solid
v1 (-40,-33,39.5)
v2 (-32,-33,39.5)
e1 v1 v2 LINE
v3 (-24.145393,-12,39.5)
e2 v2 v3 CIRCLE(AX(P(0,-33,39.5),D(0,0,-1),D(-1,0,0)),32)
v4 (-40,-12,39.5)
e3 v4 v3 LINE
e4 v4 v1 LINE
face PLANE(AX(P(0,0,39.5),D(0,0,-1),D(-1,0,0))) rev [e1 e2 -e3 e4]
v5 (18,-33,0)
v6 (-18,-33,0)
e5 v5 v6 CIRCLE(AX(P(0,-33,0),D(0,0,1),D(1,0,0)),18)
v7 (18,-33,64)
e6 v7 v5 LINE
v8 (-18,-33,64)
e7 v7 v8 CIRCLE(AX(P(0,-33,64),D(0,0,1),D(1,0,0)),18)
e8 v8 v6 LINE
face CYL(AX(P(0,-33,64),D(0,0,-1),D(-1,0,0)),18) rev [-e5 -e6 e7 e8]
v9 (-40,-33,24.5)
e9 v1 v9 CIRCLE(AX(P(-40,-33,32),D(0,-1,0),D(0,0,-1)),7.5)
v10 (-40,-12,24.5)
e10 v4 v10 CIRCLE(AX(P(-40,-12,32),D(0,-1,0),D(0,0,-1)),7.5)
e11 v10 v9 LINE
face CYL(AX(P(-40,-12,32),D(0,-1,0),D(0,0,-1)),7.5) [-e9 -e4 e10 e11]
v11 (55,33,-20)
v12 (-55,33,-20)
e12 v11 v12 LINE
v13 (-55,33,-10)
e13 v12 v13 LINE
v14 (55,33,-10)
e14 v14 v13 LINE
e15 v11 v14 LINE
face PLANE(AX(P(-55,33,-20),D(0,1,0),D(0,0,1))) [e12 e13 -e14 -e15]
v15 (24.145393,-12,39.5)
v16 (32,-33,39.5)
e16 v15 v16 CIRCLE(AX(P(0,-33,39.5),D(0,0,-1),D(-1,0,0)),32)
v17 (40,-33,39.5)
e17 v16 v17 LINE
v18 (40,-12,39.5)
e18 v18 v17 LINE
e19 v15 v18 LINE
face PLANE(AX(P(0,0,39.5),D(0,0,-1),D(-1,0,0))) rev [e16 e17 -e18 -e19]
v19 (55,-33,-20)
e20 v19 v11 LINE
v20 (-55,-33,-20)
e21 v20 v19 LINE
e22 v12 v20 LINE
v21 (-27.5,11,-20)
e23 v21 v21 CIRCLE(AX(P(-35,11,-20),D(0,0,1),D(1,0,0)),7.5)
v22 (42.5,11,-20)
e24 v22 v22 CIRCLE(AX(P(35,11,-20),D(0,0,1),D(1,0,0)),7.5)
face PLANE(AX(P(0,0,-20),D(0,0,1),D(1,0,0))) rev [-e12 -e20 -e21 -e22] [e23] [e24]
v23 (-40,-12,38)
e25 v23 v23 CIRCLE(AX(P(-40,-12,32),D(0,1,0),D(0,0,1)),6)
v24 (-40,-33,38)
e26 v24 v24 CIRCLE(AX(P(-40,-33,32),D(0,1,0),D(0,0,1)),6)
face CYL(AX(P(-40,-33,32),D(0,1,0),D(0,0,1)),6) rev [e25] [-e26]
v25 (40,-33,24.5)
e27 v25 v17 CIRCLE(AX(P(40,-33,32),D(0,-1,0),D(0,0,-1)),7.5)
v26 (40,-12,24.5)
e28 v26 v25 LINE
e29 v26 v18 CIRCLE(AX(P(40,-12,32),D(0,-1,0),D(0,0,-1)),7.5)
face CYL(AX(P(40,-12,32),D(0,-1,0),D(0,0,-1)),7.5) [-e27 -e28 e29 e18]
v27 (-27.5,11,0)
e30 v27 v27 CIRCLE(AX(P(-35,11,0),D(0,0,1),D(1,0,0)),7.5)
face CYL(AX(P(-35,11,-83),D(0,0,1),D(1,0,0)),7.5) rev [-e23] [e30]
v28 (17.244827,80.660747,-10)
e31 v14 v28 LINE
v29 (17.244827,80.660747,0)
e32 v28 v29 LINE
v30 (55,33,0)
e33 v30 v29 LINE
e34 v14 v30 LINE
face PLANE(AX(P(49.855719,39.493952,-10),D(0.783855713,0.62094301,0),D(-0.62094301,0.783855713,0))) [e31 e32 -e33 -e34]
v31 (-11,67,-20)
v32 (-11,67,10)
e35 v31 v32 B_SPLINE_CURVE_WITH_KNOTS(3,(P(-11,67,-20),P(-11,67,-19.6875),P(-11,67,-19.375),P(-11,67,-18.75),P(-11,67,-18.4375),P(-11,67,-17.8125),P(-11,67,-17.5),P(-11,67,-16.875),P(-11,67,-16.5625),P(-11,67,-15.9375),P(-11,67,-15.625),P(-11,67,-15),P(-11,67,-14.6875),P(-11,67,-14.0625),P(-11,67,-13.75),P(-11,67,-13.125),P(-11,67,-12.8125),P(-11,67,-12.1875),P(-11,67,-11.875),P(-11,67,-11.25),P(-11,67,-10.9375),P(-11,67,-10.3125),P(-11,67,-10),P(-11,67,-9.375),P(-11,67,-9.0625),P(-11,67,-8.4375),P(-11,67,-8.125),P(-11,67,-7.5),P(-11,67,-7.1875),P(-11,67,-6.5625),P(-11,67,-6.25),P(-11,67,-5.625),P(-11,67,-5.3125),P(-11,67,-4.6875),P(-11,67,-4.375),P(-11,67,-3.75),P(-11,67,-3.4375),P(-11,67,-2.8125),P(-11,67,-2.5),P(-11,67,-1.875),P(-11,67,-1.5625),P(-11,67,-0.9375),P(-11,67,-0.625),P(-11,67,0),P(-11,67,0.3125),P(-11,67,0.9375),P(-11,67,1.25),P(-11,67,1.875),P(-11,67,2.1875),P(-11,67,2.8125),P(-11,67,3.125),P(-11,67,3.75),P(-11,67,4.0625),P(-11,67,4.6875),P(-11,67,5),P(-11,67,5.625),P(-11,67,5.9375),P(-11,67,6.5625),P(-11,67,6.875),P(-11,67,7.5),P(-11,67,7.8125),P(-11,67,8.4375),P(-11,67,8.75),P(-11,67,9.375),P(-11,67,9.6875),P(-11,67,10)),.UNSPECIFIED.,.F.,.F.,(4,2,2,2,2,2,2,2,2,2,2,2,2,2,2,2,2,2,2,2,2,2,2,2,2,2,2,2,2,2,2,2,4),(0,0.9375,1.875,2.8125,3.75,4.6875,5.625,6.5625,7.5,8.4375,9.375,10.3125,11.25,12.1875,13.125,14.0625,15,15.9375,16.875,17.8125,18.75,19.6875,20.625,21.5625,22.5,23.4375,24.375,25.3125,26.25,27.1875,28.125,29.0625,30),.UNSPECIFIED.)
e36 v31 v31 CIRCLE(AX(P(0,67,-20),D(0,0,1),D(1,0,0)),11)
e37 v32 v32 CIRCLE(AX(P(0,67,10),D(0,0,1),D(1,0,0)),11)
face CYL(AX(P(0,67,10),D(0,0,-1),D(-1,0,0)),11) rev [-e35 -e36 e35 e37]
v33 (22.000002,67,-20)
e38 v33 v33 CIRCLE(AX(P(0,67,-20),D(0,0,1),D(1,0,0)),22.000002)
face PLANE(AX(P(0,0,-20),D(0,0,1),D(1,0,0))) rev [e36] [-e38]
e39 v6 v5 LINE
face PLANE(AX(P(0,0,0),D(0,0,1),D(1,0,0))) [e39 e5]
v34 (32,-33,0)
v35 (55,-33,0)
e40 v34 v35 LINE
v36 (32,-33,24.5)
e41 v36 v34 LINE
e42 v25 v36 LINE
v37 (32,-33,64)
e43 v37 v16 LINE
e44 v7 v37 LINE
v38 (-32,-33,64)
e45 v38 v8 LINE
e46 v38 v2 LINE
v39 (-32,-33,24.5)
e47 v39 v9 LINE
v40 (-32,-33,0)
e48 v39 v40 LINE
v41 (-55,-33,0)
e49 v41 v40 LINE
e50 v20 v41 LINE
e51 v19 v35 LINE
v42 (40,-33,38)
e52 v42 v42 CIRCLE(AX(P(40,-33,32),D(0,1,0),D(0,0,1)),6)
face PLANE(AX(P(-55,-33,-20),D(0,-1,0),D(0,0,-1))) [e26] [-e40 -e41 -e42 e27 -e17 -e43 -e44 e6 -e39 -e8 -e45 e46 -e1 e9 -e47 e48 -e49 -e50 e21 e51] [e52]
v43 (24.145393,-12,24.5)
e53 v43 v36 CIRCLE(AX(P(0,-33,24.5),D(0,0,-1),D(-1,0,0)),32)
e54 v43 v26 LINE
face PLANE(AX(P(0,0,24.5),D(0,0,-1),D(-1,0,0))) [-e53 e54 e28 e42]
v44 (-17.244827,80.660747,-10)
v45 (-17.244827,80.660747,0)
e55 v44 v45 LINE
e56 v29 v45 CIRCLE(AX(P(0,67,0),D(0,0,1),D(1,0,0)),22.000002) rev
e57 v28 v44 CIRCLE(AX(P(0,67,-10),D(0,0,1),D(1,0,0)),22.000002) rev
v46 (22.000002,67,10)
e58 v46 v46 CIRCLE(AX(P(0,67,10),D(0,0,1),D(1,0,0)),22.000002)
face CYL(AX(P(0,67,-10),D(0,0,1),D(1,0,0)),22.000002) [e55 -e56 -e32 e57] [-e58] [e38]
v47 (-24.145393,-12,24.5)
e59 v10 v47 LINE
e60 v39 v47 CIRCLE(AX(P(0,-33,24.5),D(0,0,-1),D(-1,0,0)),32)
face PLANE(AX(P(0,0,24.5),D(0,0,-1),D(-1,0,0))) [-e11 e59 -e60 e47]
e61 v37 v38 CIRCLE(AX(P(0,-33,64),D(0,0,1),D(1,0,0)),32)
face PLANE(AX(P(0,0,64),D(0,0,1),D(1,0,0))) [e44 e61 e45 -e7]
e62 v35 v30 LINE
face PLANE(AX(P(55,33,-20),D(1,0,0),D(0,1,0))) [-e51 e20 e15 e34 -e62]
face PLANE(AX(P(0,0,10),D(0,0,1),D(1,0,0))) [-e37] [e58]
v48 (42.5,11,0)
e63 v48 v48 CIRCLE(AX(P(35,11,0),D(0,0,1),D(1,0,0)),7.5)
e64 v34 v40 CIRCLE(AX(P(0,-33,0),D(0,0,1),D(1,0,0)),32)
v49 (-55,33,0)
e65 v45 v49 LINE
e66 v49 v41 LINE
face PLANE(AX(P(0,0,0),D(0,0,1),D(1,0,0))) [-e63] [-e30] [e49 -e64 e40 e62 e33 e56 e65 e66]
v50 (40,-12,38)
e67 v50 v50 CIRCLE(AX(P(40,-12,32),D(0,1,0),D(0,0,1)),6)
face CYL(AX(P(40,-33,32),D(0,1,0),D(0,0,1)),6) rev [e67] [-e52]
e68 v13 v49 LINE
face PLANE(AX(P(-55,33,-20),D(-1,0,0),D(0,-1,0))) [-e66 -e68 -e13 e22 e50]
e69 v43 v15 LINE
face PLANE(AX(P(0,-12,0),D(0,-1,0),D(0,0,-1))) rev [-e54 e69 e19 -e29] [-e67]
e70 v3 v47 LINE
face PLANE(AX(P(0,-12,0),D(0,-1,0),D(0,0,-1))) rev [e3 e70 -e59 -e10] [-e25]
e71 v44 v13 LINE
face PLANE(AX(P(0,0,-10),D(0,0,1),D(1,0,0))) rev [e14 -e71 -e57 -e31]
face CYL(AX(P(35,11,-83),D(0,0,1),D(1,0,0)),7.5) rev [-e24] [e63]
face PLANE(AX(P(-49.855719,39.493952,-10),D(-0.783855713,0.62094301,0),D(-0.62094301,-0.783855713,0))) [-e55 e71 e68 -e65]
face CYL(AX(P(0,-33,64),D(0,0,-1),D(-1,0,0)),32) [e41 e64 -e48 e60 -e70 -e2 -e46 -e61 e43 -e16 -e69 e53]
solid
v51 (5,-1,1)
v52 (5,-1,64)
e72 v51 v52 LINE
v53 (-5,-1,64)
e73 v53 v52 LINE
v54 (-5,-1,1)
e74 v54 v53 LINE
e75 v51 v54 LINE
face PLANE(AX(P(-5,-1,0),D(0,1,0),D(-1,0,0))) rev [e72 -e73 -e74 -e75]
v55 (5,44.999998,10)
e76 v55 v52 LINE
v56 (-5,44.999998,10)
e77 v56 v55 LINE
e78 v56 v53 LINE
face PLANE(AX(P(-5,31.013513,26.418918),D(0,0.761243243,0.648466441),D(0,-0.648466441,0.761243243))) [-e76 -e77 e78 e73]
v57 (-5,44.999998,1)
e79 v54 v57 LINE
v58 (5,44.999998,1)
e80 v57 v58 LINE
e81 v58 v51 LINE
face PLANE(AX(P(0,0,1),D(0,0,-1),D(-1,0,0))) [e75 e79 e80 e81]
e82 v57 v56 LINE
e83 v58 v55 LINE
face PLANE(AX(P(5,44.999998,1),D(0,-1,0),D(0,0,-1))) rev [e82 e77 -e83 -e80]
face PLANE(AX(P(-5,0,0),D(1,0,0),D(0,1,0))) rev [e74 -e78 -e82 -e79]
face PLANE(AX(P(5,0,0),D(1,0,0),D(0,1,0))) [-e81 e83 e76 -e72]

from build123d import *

# Parameters (mm, degrees)
SKETCH2_W                = 110
SKETCH2_H                = 66
BOSS_EXTRUDE1_DEPTH      = 20
BOSS_EXTRUDE3_DEPTH      = 10
BOSS_EXTRUDE5_DEPTH      = 10
BOSS_EXTRUDE5_DEPTH_BACK = 20
SKETCH4_R                = 22
SKETCH4_R_2              = 11
SKETCH5_R                = 11
CUT_EXTRUDE1_DEPTH       = 91
BOSS_EXTRUDE6_DEPTH      = 64
SKETCH10_W               = 10
SKETCH10_H               = 147.367843809
EXTRUDE_THIN1_DEPTH      = 15
BOSS_EXTRUDE9_DEPTH      = 5
BOSS_EXTRUDE9_DEPTH_BACK = 5
SKETCH12_W               = 15
SKETCH12_H               = 147.367843809
CUT_EXTRUDE2_DEPTH       = 83
CUT_EXTRUDE3_DEPTH       = 83
BOSS_EXTRUDE12_DEPTH     = 21
BOSS_EXTRUDE12_2_DEPTH   = 21
LOFT2_START              = -33
LOFT2_OUTLINE_W          = 64
LOFT2_OUTLINE_H          = 15
LOFT2_DEPTH              = 21
CUT_EXTRUDE4_START       = -21
SKETCH16_R               = 18
CUT_EXTRUDE4_DEPTH       = 21
CUT_EXTRUDE5_DEPTH       = 21
SKETCH25_W               = 10
SKETCH25_H               = 45.999998161
BOSS_EXTRUDE15_DEPTH     = 9


# Read off the part's stored shape, not the designer's step: Loft2
with BuildPart() as part:
    # Sketch2 → Boss-Extrude1 (new body)
    with BuildSketch(Plane.XY):
        Rectangle(SKETCH2_W, SKETCH2_H)
    extrude(amount=-BOSS_EXTRUDE1_DEPTH)

    # Sketch3 → Boss-Extrude3 (add)
    with BuildSketch(Plane.XY):
        with BuildLine():
            Line((-55, 33), (55, 33))
            Line((55, 33), (17.244826829, 80.660747731))
            ThreePointArc((17.244826829, 80.660747731), (3.5e-08, 89.000001839), (-17.244826785, 80.660747787))
            Line((-17.244826785, 80.660747787), (-55, 33))
        make_face()
    extrude(amount=-BOSS_EXTRUDE3_DEPTH)

    # Sketch4 → Boss-Extrude5 (add, two sides: drawn at the far end of the back side and taken through both)
    with BuildSketch(Plane.XY.offset(-BOSS_EXTRUDE5_DEPTH_BACK)):
        with Locations((0, 67)):
            Circle(SKETCH4_R)
        with Locations(Location((0, 67, 0), (0, 0, 180))):
            Circle(SKETCH4_R_2, mode=Mode.SUBTRACT)
    extrude(amount=BOSS_EXTRUDE5_DEPTH + BOSS_EXTRUDE5_DEPTH_BACK)

    # Sketch5 → Cut-Extrude1 (cut)
    with BuildSketch(Plane.XY):
        with Locations(Location((0, 67, 0), (0, 0, 180))):
            Circle(SKETCH5_R)
    extrude(amount=-CUT_EXTRUDE1_DEPTH, mode=Mode.SUBTRACT)

    # Sketch6 → Boss-Extrude6 (add)
    with BuildSketch(Plane.XY):
        with BuildLine():
            Line((-32, -33), (-18, -33))
            ThreePointArc((-18, -33), (0, -15), (18, -33))
            Line((18, -33), (32, -33))
            ThreePointArc((32, -33), (0, -1), (-32, -33))
        make_face()
    extrude(amount=BOSS_EXTRUDE6_DEPTH)

    # Sketch10 → Extrude-Thin1 (add)
    with BuildSketch(Plane(origin=(0, 0, -20), x_dir=(-1, 0, 0), z_dir=(0, 0, -1))):
        with Locations((5, 40.683921905)):
            Rectangle(SKETCH10_W, SKETCH10_H)
    extrude(amount=EXTRUDE_THIN1_DEPTH)

    # Sketch12 → Cut-Extrude2 (cut)
    with BuildSketch(Plane(origin=(0, 0, 0), x_dir=(0, 0, -1), z_dir=(1, 0, 0))):
        with Locations((27.5, 40.683921905)):
            Rectangle(SKETCH12_W, SKETCH12_H)
    extrude(amount=-CUT_EXTRUDE2_DEPTH, mode=Mode.SUBTRACT)

    # Sketch13 → Cut-Extrude3 (cut)
    with BuildSketch(Plane.XY):
        with BuildLine():
            Line((-42.5, 11), (-35, 11))
            Line((-35, 11), (-27.5, 11))
            ThreePointArc((-27.5, 11), (-35, 18.5), (-42.5, 11))
        make_face()
        with BuildLine():
            Line((-27.5, 11), (-35, 11))
            Line((-35, 11), (-42.5, 11))
            ThreePointArc((-42.5, 11), (-35, 3.5), (-27.5, 11))
        make_face()
        with BuildLine():
            ThreePointArc((42.5, 11), (35, 18.5), (27.5, 11))
            Line((27.5, 11), (35, 11))
            Line((35, 11), (42.5, 11))
        make_face()
        with BuildLine():
            Line((35, 11), (27.5, 11))
            ThreePointArc((27.5, 11), (35, 3.5), (42.5, 11))
            Line((42.5, 11), (35, 11))
        make_face()
    extrude(amount=-CUT_EXTRUDE3_DEPTH, mode=Mode.SUBTRACT)



with BuildPart() as body_2:
    # Sketch11 → Boss-Extrude9 (new, two sides: drawn at the far end of the back side and taken through both)
    with BuildSketch(Plane(origin=(0, 0, 0), x_dir=(0, 0, -1), z_dir=(1, 0, 0)).offset(-BOSS_EXTRUDE9_DEPTH_BACK)):
        Polygon((-10, -1), (-64, -1), (-10, 44.999998161), align=None)
    extrude(amount=BOSS_EXTRUDE9_DEPTH + BOSS_EXTRUDE9_DEPTH_BACK)

    # Sketch25 → Boss-Extrude15 (add)
    with BuildSketch(Plane(origin=(0, 0, 10), x_dir=(-1, 0, 0), z_dir=(0, 0, -1))):
        with Locations((0, 21.999999081)):
            Rectangle(SKETCH25_W, SKETCH25_H)
    extrude(amount=BOSS_EXTRUDE15_DEPTH)


with BuildPart() as body_3:
    # Sketch14 → Boss-Extrude12 (new body)
    with BuildSketch(Plane.XZ.offset(33)):
        with BuildLine():
            Line((-40, 24.5), (-32, 24.5))
            Line((-32, 24.5), (-32, 39.5))
            Line((-32, 39.5), (-40, 39.5))
            ThreePointArc((-40, 39.5), (-47.5, 32), (-40, 24.5))
        make_face()
    extrude(amount=-BOSS_EXTRUDE12_DEPTH)


with BuildPart() as body_4:
    # Sketch14 → Boss-Extrude12 2 (new body)
    with BuildSketch(Plane.XZ.offset(33)):
        with BuildLine():
            ThreePointArc((40, 24.5), (47.5, 32), (40, 39.5))
            Line((40, 39.5), (32, 39.5))
            Line((32, 39.5), (32, 24.5))
            Line((32, 24.5), (40, 24.5))
        make_face()
    extrude(amount=-BOSS_EXTRUDE12_2_DEPTH)


with BuildPart() as part_1:
    add(part.part)

    add(body_3.part)  # Loft2 merges body 3

    add(body_4.part)  # Loft2 merges body 4
    # Loft2 outline → Loft2 (add)
    with BuildSketch(Plane(origin=(0, 0, 0), x_dir=(1, 0, 0), z_dir=(0, 1, 0)).offset(LOFT2_START)):
        with Locations((0, -32)):
            Rectangle(LOFT2_OUTLINE_W, LOFT2_OUTLINE_H)
    extrude(amount=LOFT2_DEPTH)

    # Sketch16 → Cut-Extrude4 (cut)
    with BuildSketch(Plane.XY.offset(39.5).offset(CUT_EXTRUDE4_START)):
        with Locations((0, -33)):
            Circle(SKETCH16_R)
    extrude(amount=CUT_EXTRUDE4_DEPTH, mode=Mode.SUBTRACT)

    # Sketch17 → Cut-Extrude5 (cut)
    with BuildSketch(Plane(origin=(0, -12, 0), x_dir=(1, 0, 0), z_dir=(0, 1, 0))):
        with BuildLine():
            ThreePointArc((-34, -32), (-40, -26), (-46, -32))
            Line((-46, -32), (-34, -32))
        make_face()
        with BuildLine():
            Line((-34, -32), (-46, -32))
            ThreePointArc((-46, -32), (-40, -38), (-34, -32))
        make_face()
        with BuildLine():
            ThreePointArc((46, -32), (40, -26), (34, -32))
            Line((34, -32), (46, -32))
        make_face()
        with BuildLine():
            Line((46, -32), (34, -32))
            ThreePointArc((34, -32), (40, -38), (46, -32))
        make_face()
    extrude(amount=-CUT_EXTRUDE5_DEPTH, mode=Mode.SUBTRACT)


solid = Compound([body_2.part, part_1.part])
